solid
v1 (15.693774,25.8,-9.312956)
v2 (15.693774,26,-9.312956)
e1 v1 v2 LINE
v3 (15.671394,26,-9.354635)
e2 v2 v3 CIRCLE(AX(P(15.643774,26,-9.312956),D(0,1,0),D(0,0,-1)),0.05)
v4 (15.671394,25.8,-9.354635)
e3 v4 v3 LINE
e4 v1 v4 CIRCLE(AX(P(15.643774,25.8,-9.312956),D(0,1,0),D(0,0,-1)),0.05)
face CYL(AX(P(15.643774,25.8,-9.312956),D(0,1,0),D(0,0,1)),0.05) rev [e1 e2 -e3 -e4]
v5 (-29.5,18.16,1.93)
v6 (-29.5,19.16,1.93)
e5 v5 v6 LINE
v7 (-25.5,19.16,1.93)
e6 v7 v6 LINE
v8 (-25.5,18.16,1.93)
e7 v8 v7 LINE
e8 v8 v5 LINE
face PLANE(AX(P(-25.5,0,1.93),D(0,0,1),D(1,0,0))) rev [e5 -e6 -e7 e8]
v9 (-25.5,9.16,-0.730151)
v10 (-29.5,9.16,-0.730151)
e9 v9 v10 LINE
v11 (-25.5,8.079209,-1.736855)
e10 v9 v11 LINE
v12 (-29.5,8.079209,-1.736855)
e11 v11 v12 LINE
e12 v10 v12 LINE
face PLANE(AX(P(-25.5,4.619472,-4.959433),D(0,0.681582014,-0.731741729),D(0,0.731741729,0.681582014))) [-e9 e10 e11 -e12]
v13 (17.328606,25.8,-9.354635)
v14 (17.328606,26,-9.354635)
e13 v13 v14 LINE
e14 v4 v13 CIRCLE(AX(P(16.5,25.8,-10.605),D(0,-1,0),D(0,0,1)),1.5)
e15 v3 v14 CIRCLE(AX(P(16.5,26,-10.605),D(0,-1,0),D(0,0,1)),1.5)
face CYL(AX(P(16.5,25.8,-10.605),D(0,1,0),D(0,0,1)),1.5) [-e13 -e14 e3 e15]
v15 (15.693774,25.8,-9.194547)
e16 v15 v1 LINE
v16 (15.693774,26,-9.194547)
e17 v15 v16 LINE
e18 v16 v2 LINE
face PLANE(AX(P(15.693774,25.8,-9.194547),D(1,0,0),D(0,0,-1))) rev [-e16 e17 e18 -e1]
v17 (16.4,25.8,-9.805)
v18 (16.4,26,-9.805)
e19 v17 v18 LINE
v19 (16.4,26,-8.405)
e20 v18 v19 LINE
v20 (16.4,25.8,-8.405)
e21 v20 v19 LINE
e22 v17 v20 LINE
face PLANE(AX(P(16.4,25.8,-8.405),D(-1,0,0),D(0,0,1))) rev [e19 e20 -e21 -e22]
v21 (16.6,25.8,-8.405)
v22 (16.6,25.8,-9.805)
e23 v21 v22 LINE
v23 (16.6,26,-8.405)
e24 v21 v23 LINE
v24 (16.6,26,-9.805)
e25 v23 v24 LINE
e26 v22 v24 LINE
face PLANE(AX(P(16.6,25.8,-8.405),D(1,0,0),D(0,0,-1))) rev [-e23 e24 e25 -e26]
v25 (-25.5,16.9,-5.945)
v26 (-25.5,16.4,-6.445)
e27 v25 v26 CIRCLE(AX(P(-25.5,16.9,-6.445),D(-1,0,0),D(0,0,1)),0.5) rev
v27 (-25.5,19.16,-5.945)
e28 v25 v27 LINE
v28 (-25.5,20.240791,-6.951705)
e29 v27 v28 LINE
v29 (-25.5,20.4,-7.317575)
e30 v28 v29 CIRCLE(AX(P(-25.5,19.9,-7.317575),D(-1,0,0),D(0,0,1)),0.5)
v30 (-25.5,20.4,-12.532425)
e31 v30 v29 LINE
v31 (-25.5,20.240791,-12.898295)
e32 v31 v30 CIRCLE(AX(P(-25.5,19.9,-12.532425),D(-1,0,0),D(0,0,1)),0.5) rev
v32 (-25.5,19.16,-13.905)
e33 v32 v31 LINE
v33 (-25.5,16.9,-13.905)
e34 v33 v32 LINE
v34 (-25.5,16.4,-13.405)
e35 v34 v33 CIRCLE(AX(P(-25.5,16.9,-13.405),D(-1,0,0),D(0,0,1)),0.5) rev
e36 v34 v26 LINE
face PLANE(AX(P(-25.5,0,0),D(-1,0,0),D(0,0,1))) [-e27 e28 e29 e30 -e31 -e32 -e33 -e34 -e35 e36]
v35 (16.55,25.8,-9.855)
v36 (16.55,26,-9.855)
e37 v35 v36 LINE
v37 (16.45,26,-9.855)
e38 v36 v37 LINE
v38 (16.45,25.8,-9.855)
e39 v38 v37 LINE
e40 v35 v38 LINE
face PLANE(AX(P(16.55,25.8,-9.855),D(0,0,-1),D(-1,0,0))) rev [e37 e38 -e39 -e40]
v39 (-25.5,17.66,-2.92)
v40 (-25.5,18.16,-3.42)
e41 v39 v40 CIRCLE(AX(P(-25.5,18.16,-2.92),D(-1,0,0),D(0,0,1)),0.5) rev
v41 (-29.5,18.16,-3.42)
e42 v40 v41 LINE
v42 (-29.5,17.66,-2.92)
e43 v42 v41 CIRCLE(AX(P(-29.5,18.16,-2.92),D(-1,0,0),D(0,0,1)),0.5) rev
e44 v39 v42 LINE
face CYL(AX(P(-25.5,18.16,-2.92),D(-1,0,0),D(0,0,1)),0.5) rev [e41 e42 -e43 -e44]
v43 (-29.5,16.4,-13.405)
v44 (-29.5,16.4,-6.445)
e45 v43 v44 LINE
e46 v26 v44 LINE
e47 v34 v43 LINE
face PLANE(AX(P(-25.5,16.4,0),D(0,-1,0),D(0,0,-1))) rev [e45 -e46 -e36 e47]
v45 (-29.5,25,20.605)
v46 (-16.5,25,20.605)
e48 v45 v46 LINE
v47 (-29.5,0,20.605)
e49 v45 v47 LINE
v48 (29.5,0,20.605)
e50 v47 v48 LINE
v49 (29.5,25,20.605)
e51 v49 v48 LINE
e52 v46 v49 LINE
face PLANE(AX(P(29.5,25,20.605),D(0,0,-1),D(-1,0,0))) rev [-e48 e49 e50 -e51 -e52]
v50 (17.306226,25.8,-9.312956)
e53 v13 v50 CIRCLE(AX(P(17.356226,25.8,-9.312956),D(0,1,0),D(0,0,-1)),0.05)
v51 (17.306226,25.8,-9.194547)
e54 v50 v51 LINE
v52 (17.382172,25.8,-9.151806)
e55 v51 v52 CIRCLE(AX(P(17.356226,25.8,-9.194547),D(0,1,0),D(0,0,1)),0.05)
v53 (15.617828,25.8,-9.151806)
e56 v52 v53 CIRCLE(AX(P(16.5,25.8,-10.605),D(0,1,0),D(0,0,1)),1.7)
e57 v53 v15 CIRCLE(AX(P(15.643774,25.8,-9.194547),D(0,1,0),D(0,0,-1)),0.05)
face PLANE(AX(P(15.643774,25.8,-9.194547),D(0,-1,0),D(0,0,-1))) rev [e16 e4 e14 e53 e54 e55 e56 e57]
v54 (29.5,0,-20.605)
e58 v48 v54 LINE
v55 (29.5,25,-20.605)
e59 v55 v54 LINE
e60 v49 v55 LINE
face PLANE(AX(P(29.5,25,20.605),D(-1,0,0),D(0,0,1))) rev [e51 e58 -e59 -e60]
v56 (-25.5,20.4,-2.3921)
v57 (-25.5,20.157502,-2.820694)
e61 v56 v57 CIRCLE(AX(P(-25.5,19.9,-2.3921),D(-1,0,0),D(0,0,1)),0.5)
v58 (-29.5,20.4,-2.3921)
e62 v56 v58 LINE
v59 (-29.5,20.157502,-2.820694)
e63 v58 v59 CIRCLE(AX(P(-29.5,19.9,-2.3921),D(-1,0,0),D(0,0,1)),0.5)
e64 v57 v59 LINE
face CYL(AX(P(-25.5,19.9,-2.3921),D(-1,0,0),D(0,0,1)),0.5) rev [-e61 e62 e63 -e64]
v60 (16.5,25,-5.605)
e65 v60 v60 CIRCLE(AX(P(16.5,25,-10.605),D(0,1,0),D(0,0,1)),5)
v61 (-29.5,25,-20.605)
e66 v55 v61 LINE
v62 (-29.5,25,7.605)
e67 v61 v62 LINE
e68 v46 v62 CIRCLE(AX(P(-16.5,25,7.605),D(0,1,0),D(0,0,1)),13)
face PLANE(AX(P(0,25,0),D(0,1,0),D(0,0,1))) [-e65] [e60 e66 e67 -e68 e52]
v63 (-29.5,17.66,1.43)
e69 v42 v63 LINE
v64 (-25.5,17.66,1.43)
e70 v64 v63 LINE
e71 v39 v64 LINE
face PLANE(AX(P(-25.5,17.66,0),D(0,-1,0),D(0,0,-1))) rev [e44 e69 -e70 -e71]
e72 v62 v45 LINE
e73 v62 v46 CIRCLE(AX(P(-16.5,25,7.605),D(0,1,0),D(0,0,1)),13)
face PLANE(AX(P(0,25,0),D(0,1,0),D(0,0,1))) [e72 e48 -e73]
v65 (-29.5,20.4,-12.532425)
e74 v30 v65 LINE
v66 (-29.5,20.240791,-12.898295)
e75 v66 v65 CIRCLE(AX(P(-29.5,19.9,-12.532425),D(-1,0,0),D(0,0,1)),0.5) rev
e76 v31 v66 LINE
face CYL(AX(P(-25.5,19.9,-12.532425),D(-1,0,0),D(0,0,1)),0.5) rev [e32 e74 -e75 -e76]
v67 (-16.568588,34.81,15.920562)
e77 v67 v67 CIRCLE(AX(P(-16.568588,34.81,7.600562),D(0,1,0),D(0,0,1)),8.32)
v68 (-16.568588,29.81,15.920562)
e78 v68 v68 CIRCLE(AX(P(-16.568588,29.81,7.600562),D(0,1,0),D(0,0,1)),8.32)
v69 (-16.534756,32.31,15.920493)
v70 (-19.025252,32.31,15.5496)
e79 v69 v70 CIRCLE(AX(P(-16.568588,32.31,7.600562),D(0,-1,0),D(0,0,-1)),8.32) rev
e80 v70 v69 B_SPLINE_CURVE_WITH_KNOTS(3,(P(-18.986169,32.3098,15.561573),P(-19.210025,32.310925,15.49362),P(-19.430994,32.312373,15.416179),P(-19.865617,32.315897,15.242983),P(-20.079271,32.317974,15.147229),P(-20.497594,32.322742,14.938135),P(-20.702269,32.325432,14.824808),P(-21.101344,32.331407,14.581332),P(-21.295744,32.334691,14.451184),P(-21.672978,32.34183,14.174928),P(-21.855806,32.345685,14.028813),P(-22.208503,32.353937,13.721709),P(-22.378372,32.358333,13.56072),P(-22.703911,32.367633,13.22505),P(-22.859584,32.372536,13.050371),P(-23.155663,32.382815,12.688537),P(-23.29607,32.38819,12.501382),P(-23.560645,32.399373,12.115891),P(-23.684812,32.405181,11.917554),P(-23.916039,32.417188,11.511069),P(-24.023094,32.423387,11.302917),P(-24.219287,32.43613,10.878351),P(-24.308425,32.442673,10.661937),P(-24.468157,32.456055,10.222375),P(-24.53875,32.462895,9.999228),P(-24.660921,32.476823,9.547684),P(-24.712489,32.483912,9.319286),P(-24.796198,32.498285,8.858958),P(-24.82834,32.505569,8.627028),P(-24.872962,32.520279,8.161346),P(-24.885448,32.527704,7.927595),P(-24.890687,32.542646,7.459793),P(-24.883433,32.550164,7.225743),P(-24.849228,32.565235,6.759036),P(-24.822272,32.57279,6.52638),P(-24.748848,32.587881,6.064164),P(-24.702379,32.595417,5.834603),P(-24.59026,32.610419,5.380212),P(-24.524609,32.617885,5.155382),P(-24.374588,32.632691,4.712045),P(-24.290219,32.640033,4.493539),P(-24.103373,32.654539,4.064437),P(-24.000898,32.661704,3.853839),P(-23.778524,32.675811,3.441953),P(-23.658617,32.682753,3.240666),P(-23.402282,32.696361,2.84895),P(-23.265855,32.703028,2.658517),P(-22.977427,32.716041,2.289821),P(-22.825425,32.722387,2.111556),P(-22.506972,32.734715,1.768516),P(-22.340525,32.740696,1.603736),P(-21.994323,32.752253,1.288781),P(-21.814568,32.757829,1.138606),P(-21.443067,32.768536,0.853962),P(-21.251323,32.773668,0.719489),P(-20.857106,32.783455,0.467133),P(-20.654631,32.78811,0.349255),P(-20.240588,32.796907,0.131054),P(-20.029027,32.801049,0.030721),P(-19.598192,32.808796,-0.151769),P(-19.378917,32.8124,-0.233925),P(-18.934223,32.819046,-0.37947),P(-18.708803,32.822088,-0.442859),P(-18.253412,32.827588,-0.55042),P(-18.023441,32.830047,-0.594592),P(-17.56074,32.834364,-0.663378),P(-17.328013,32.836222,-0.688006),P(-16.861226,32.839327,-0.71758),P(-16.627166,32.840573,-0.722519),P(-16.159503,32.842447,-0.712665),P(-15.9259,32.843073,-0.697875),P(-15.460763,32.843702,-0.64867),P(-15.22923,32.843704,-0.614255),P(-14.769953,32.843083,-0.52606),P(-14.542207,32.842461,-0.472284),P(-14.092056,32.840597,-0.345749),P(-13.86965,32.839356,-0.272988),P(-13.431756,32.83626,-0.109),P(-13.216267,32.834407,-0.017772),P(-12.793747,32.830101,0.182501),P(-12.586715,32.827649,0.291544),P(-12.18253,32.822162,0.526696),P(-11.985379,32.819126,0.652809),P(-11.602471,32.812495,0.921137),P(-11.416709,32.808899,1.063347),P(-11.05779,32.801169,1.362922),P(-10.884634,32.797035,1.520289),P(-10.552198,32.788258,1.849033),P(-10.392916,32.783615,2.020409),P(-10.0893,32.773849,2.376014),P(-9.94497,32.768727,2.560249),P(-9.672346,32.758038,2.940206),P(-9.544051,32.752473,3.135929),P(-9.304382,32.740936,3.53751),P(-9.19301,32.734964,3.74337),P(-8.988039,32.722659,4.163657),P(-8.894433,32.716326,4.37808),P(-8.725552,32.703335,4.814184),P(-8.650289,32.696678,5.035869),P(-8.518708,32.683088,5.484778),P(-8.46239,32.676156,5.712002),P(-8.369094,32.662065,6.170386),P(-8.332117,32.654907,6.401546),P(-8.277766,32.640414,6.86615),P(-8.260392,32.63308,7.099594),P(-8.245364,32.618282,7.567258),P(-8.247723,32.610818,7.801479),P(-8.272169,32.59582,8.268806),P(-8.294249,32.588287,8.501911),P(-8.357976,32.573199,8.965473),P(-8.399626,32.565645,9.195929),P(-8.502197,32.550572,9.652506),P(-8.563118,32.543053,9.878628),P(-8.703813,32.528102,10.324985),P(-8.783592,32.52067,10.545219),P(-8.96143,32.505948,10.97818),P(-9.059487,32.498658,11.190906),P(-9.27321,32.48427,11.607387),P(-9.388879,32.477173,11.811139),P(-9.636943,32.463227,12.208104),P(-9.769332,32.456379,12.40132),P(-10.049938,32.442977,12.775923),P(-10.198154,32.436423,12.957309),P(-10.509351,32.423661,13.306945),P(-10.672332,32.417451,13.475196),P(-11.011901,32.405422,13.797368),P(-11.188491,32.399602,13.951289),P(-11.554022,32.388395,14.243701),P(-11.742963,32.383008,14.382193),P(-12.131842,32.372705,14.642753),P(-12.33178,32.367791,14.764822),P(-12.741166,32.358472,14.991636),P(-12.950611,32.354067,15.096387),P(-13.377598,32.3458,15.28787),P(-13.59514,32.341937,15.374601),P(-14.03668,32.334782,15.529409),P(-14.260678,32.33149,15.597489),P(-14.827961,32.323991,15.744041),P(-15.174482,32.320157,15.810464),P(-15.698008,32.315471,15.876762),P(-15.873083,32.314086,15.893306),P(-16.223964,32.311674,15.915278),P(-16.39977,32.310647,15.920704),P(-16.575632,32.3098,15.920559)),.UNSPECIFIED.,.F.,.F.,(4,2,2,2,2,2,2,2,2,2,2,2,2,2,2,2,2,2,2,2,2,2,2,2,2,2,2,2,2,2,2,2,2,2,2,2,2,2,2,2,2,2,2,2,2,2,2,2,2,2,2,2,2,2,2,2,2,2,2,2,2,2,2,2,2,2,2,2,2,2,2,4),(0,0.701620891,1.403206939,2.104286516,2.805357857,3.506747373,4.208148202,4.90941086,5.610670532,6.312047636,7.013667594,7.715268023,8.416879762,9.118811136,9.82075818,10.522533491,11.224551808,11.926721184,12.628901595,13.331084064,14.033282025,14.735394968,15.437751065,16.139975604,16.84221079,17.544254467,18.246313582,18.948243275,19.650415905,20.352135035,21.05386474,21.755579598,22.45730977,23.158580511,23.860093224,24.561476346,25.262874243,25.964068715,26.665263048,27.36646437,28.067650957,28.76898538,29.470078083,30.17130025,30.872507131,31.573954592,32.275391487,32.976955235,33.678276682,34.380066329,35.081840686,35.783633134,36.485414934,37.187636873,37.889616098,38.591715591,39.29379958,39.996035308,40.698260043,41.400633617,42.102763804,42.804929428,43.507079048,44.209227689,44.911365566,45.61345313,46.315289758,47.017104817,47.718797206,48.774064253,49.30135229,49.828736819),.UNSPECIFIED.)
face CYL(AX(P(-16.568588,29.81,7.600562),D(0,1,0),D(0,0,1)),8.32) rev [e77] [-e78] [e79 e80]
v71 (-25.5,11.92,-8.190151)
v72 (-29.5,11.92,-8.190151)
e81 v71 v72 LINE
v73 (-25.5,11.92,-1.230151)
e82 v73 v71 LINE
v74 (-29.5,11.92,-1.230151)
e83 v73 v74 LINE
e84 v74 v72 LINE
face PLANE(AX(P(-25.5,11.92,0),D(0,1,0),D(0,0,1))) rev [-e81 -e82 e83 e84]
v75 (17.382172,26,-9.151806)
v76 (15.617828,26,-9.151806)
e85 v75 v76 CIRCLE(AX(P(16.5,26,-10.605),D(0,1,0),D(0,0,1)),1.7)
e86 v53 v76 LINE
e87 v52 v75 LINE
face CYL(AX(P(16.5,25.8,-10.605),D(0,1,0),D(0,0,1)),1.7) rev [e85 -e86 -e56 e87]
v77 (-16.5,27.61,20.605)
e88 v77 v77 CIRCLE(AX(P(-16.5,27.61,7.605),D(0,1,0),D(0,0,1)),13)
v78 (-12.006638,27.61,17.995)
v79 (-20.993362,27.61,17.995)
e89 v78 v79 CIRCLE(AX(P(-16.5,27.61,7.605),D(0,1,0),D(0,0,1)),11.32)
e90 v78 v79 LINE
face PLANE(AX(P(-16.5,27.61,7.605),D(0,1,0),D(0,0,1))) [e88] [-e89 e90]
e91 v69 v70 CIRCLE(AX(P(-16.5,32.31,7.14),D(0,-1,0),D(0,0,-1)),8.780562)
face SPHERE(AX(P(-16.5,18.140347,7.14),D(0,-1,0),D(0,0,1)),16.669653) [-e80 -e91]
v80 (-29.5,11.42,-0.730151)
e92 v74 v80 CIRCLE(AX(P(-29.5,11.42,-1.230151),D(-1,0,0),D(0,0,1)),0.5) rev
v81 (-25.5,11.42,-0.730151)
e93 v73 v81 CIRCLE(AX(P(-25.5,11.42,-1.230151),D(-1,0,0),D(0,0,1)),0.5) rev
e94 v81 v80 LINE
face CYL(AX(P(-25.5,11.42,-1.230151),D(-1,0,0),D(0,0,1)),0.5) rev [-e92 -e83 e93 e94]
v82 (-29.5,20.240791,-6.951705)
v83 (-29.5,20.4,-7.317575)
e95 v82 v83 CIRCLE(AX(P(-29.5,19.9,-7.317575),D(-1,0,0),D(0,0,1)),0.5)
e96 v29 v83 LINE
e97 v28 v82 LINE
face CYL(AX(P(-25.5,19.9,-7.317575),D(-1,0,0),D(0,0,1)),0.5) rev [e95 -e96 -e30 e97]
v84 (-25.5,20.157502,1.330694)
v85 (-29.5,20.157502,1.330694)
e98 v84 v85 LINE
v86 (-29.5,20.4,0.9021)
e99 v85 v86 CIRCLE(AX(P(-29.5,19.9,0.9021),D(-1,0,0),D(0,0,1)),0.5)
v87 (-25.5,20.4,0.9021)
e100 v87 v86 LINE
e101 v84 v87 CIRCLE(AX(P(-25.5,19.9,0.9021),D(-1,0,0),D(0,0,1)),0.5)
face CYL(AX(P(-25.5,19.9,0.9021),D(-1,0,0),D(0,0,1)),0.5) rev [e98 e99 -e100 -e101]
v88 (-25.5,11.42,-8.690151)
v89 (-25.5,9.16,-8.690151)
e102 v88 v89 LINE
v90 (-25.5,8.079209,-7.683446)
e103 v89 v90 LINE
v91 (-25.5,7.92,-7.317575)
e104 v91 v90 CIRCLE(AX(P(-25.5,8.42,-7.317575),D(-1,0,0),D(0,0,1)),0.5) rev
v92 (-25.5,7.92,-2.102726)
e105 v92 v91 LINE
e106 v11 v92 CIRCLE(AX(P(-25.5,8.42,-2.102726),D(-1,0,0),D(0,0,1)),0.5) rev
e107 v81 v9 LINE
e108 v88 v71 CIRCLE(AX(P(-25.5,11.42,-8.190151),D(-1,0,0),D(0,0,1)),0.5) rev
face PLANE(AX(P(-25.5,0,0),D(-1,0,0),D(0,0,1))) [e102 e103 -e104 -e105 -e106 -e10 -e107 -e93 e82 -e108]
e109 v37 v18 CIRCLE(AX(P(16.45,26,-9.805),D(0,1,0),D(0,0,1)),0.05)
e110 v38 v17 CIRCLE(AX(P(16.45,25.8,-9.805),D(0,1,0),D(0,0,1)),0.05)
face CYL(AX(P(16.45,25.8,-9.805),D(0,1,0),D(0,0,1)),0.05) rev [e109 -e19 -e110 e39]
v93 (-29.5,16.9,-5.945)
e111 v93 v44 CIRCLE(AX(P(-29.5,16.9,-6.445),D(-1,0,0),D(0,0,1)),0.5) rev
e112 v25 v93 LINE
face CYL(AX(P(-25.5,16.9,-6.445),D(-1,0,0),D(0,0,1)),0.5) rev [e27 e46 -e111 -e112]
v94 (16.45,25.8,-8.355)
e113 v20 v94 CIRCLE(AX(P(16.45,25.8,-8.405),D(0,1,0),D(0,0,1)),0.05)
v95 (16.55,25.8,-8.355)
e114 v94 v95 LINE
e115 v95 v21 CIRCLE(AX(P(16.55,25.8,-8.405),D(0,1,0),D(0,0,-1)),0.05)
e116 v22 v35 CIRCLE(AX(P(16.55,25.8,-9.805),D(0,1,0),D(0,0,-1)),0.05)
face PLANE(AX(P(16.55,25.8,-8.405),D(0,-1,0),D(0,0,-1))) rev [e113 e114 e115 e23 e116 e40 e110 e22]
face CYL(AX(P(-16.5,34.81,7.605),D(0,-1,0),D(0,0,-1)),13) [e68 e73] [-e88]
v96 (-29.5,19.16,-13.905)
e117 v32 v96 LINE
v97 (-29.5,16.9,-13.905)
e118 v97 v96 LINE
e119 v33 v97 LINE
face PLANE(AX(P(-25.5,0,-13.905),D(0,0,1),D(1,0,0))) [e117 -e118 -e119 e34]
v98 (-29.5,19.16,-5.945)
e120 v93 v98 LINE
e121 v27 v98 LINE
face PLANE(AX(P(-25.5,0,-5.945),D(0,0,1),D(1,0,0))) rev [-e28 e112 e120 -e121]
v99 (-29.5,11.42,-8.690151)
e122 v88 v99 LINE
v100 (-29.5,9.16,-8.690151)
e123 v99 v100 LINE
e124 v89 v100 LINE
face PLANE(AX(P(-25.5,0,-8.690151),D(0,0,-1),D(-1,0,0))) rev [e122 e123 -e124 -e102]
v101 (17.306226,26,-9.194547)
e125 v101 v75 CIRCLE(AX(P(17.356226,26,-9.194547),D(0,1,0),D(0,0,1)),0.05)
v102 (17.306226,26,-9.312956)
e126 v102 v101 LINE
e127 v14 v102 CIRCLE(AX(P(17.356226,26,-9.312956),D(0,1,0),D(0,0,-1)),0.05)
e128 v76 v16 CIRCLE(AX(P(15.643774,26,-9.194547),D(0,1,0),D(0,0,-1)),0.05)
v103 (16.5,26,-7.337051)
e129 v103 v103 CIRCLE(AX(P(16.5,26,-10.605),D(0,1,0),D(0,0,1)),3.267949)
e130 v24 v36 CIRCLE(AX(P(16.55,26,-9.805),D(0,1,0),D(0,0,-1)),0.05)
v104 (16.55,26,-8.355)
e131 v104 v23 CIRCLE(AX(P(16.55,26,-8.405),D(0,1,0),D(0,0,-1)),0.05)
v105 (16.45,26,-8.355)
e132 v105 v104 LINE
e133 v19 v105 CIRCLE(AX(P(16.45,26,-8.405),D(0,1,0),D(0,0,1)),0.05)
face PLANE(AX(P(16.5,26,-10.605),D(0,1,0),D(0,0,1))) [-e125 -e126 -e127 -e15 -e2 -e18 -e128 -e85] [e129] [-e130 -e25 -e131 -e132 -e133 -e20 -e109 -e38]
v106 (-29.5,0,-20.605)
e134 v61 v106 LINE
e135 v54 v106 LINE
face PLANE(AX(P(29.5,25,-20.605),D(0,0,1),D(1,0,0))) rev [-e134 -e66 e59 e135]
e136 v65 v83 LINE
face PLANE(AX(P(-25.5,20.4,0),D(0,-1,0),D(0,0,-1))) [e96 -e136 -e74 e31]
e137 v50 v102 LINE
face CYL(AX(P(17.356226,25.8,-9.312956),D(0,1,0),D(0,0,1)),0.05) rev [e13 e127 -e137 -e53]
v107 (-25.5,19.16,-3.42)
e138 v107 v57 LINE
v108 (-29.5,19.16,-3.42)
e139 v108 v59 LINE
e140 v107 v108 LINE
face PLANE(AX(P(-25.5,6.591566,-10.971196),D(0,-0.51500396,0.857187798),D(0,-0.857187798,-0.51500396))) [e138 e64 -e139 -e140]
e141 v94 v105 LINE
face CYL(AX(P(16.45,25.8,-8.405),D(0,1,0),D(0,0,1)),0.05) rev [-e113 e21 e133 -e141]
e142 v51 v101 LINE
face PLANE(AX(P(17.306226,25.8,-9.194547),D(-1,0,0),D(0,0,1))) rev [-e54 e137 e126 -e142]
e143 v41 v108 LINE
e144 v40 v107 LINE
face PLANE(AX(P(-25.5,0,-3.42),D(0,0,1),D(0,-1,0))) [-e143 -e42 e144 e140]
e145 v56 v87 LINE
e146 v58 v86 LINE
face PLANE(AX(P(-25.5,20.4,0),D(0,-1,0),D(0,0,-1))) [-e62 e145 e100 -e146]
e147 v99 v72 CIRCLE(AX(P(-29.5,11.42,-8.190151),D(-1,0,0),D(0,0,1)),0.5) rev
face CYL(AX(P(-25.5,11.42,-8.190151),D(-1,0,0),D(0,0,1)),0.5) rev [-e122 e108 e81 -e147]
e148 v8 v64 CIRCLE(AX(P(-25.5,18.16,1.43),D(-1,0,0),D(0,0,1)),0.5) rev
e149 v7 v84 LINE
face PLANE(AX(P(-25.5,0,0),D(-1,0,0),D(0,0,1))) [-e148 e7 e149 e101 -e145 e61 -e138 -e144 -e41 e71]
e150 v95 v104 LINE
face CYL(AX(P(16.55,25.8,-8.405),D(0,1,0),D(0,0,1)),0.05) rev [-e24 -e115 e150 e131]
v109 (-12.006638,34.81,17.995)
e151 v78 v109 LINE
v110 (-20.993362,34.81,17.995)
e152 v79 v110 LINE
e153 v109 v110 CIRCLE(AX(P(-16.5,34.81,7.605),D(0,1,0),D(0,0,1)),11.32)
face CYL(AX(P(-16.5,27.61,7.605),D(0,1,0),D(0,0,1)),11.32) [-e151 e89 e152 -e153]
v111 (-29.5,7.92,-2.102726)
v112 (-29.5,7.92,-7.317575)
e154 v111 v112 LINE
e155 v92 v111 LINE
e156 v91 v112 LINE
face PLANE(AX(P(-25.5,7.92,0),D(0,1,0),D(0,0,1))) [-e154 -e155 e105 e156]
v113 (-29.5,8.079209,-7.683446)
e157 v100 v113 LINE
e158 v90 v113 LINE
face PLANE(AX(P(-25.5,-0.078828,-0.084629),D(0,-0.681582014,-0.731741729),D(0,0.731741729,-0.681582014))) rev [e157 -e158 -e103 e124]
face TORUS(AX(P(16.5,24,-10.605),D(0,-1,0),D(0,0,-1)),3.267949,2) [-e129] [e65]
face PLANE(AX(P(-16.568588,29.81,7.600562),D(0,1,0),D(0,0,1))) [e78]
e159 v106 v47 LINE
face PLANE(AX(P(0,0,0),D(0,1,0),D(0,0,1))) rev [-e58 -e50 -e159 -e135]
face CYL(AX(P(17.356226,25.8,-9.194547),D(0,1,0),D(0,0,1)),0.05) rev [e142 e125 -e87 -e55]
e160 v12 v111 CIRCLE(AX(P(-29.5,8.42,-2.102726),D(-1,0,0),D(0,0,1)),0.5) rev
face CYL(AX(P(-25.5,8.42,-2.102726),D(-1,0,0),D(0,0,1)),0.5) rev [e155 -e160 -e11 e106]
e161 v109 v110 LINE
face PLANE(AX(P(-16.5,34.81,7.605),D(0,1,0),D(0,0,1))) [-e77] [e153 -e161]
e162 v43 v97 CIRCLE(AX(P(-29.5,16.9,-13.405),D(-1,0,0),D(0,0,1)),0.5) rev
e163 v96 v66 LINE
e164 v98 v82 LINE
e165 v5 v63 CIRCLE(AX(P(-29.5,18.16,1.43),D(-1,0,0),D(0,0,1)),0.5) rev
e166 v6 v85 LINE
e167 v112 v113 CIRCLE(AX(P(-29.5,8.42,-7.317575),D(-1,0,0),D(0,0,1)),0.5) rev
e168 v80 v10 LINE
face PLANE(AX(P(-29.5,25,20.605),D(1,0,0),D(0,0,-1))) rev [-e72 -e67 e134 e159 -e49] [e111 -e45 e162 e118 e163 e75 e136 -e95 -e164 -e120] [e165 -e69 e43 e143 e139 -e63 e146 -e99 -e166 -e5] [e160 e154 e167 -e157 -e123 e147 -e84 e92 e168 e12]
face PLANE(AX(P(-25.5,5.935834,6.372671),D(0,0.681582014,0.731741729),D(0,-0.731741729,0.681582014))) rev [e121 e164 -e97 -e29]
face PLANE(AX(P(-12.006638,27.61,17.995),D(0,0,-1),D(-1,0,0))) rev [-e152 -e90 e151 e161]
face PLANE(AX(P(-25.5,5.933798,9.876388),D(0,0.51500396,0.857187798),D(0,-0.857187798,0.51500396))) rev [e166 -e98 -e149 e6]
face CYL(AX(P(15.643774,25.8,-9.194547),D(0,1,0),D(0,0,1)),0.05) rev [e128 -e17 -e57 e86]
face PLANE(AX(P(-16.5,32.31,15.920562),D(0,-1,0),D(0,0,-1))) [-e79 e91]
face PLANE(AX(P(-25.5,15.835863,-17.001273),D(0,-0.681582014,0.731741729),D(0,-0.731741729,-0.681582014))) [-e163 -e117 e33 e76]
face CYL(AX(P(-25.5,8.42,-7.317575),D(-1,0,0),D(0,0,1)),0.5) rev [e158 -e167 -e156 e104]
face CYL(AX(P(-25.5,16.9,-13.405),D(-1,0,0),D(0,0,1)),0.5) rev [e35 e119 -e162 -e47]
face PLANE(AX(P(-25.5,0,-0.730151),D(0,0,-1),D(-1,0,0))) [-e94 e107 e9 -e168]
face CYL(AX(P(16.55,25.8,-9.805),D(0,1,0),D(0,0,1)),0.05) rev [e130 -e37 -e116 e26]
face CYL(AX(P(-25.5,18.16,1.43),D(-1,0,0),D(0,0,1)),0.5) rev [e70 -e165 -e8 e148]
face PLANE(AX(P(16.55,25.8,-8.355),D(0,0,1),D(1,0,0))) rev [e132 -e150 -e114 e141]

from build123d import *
from build123d.topology import SkipClean

# Parameters (mm, degrees)
CROQUIS1_W              = 59
CROQUIS1_H              = 41.21
SALIENTE_EXTRUIR1_DEPTH = 25
CROQUIS2_R              = 13
SALIENTE_EXTRUIR2_DEPTH = 9.81
CORTAR_EXTRUIR1_START   = -7.2
CROQUIS4_R              = 13
CROQUIS4_R_2            = 11.32
CORTAR_EXTRUIR1_DEPTH   = 7.2
CORTAR_EXTRUIR2_START   = -7.2
CORTAR_EXTRUIR2_DEPTH   = 7.2
CROQUIS7_R              = 8.32
CORTAR_EXTRUIR3_DEPTH   = 5
CROQUIS10_R             = 5
SALIENTE_EXTRUIR3_DEPTH = 1
REDONDEO1_R             = 2
CORTAR_EXTRUIR5_DEPTH   = 0.2
CROQUIS13_R             = 2.5
CORTAR_EXTRUIR6_DEPTH   = 5.2
ROSCA1_PITCH            = 0.8
CORTAR_EXTRUIR8_DEPTH   = 4
CROQUIS17_W             = 9.488888662
CROQUIS17_H             = 7.855040283
SALIENTE_EXTRUIR4_DEPTH = 10


with BuildPart() as part:
    # Croquis1 → Saliente-Extruir1 (new body)
    with BuildSketch(Plane(origin=(0, 0, 0), x_dir=(1, 0, 0), z_dir=(0, 1, 0))):
        Rectangle(CROQUIS1_W, CROQUIS1_H)
    extrude(amount=SALIENTE_EXTRUIR1_DEPTH)

    # Croquis2 → Saliente-Extruir2 (add)
    with BuildSketch(Plane(origin=(0, 25, 0), x_dir=(1, 0, 0), z_dir=(0, 1, 0))):
        with Locations(Location((-16.5, -7.605, 0), (0, 0, 270))):
            Circle(CROQUIS2_R)
    extrude(amount=SALIENTE_EXTRUIR2_DEPTH)

    # Croquis4 → Cortar-Extruir1 (cut)
    with BuildSketch(Plane(origin=(0, 34.81, 0), x_dir=(1, 0, 0), z_dir=(0, 1, 0)).offset(CORTAR_EXTRUIR1_START)):
        with Locations(Location((-16.5, -7.605, 0), (0, 0, 270))):
            Circle(CROQUIS4_R)
        with Locations(Location((-16.5, -7.605, 0), (0, 0, 270))):
            Circle(CROQUIS4_R_2, mode=Mode.SUBTRACT)
    extrude(amount=CORTAR_EXTRUIR1_DEPTH, mode=Mode.SUBTRACT)

    # Croquis6 → Cortar-Extruir2 (cut)
    with BuildSketch(Plane(origin=(0, 34.81, 0), x_dir=(1, 0, 0), z_dir=(0, 1, 0)).offset(CORTAR_EXTRUIR2_START)):
        with BuildLine():
            Line((-12.00663823, -17.995), (-20.99336177, -17.995))
            ThreePointArc((-20.99336177, -17.995), (-16.5, -18.925), (-12.00663823, -17.995))
        make_face()
    extrude(amount=CORTAR_EXTRUIR2_DEPTH, mode=Mode.SUBTRACT)

    # Croquis7 → Cortar-Extruir3 (cut)
    with BuildSketch(Plane(origin=(0, 34.81, 0), x_dir=(1, 0, 0), z_dir=(0, 1, 0))):
        with Locations(Location((-16.568588437, -7.600561682, 0), (0, 0, 270))):
            Circle(CROQUIS7_R)
    extrude(amount=-CORTAR_EXTRUIR3_DEPTH, mode=Mode.SUBTRACT)

    # Croquis9 → Revolución2 (revolve)
    with BuildSketch(Plane.ZY.offset(16.5)):
        with BuildLine():
            Line((15.920561682, 32.31), (7.14, 32.31))
            Line((7.14, 32.31), (7.14, 34.81))
            ThreePointArc((7.14, 34.81), (11.704763506, 34.17282232), (15.920561682, 32.31))
        make_face()
    revolve(axis=Axis((-16.5, 32.31, 7.14), (0, 1, 0)))

    # Croquis10 → Saliente-Extruir3 (add)
    with BuildSketch(Plane(origin=(0, 25, 0), x_dir=(1, 0, 0), z_dir=(0, 1, 0))):
        with Locations(Location((16.5, 10.605, 0), (0, 0, 270))):
            Circle(CROQUIS10_R)
    extrude(amount=SALIENTE_EXTRUIR3_DEPTH)

    # Redondeo1
    # the kernel refuses this fillet: 2 mm, written as the material it takes off along each edge
    with BuildSketch(Plane(origin=(16.5, 26, -10.605), x_dir=(0, 0, 1), z_dir=(-1, 0, 0))) as redondeo1_piece_1:
        with BuildLine():
            CenterArc((3.267949192, -2), REDONDEO1_R, 30, 60)
            Line((3.267949192, 0), (3.267949192, 0.04))
            Line((3.267949192, 0.04), (5, 0.04))
            Line((5, 0.04), (5.04, 0))
            ThreePointArc((5.04, 0), (5.04, -0.5), (5.034641016, -0.98))
            Line((5.034641016, -0.98), (5, -1))
        make_face()
    revolve(axis=Axis((16.5, 26, -10.605), (0, 1, 0)), mode=Mode.SUBTRACT)

    # Croquis12 → Cortar-Extruir5 (cut)
    with BuildSketch(Plane(origin=(0, 26, 0), x_dir=(1, 0, 0), z_dir=(0, 1, 0))):
        with BuildLine():
            Line((15.693774225, 9.194547086), (15.693774225, 9.312956107))
            ThreePointArc((15.693774225, 9.312956107), (15.687825385, 9.33660976), (15.671394411, 9.354634942))
            ThreePointArc((15.671394411, 9.354634942), (16.5, 12.105), (17.328605589, 9.354634942))
            ThreePointArc((17.328605589, 9.354634942), (17.312174615, 9.33660976), (17.306225775, 9.312956107))
            Line((17.306225775, 9.312956107), (17.306225775, 9.194547086))
            ThreePointArc((17.306225775, 9.194547086), (17.331703456, 9.150973517), (17.38217201, 9.151806089))
            ThreePointArc((17.38217201, 9.151806089), (16.5, 12.305), (15.61782799, 9.151806089))
            ThreePointArc((15.61782799, 9.151806089), (15.668296544, 9.150973517), (15.693774225, 9.194547086))
        make_face()
        with BuildLine():
            Line((16.55, 8.355), (16.45, 8.355))
            ThreePointArc((16.45, 8.355), (16.414644661, 8.369644661), (16.4, 8.405))
            Line((16.4, 8.405), (16.4, 9.805))
            ThreePointArc((16.4, 9.805), (16.414644661, 9.840355339), (16.45, 9.855))
            Line((16.45, 9.855), (16.55, 9.855))
            ThreePointArc((16.55, 9.855), (16.585355339, 9.840355339), (16.6, 9.805))
            Line((16.6, 9.805), (16.6, 8.405))
            ThreePointArc((16.6, 8.405), (16.585355339, 8.369644661), (16.55, 8.355))
        make_face()
    extrude(amount=-CORTAR_EXTRUIR5_DEPTH, mode=Mode.SUBTRACT)

    # Croquis13 → Cortar-Extruir6 (cut)
    with BuildSketch(Plane(origin=(0, 0, -20.605), x_dir=(-1, 0, 0), z_dir=(0, 0, -1))):
        with Locations((19, 13.3)):
            Circle(CROQUIS13_R)
    extrude(amount=-CORTAR_EXTRUIR6_DEPTH, mode=Mode.SUBTRACT)

    # Rosca1: the profile of Perfil de rosca1 profile screwed along a right-hand helix of 6.5 turns, 8 arcs to a turn; built about Z, then put on its axis
    with SkipClean():  # the faces are left unmerged after this step: merging them gives an invalid solid
        rosca1_z = Axis((0, 0, 0), (0, 0, 1))
        rosca1_corners = [(2.5003, 0, -0.000173205), (2.5003, 0, 0.700173203), (2.0669873, 0, 0.449999999), (2.0669873, 0, 0.249999999)]
        with BuildLine(mode=Mode.PRIVATE) as rosca1_profile:
            Line(rosca1_corners[0], rosca1_corners[1])
            Line(rosca1_corners[1], rosca1_corners[2])
            Line(rosca1_corners[2], rosca1_corners[3])
            Line(rosca1_corners[3], rosca1_corners[0])
        rosca1_cap = Face(rosca1_profile.wire())
        rosca1_turn_angles = [0, 22.5, 45, 67.5, 90, 112.5, 135, 157.5, 180, 202.5, 225, 247.5, 270, 292.5, 315, 337.5, 360]
        rosca1_turn_weights = [1, 0.9238795325112867, 1, 0.9238795325112867, 1, 0.9238795325112867, 1, 0.9238795325112867, 1, 0.9238795325112867, 1, 0.9238795325112867, 1, 0.9238795325112867, 1, 0.9238795325112867, 1]
        rosca1_turn_rails = [Edge.make_bspline([Vector(p[0], p[1], 0).rotate(rosca1_z, rosca1_turn_angles[k]) / rosca1_turn_weights[k] + Vector(0, 0, p[2] + ROSCA1_PITCH * rosca1_turn_angles[k] / 360) for k in range(17)], [0, 0, 0, 1, 1, 2, 2, 3, 3, 4, 4, 5, 5, 6, 6, 7, 7, 8, 8, 8], 2, rosca1_turn_weights) for p in rosca1_corners]
        rosca1_turn_sides = [Face.make_surface_from_curves(rosca1_turn_rails[p[0]], rosca1_turn_rails[p[1]]) for p in [(0, 1), (1, 2), (2, 3), (3, 0)]]
        rosca1_last_angles = [2160, 2182.5, 2205, 2227.5, 2250, 2272.5, 2295, 2317.5, 2340]
        rosca1_last_weights = [1, 0.9238795325112867, 1, 0.9238795325112867, 1, 0.9238795325112867, 1, 0.9238795325112867, 1]
        rosca1_last_rails = [Edge.make_bspline([Vector(p[0], p[1], 0).rotate(rosca1_z, rosca1_last_angles[k]) / rosca1_last_weights[k] + Vector(0, 0, p[2] + ROSCA1_PITCH * rosca1_last_angles[k] / 360) for k in range(9)], [0, 0, 0, 1, 1, 2, 2, 3, 3, 4, 4, 4], 2, rosca1_last_weights) for p in rosca1_corners]
        rosca1_last_sides = [Face.make_surface_from_curves(rosca1_last_rails[p[0]], rosca1_last_rails[p[1]]) for p in [(0, 1), (1, 2), (2, 3), (3, 0)]]
        rosca1 = Plane(origin=(-19, 13.3, -20.605), x_dir=(1, 0, 0), z_dir=(0, 0, 1)) * Solid(Shell([*[p.moved(Location((0, 0, ROSCA1_PITCH * i))) for i in range(6) for p in rosca1_turn_sides], *rosca1_last_sides, rosca1_cap, rosca1_cap.rotate(rosca1_z, 2340).moved(Location((0, 0, ROSCA1_PITCH * 2340 / 360)))]))
        add(rosca1)

    # Croquis16 → Cortar-Extruir8 (cut)
    with SkipClean():  # the faces are left unmerged after this step: merging them gives an invalid solid
        with BuildSketch(Plane.ZY.offset(29.5)):
            with BuildLine():
                Line((-5.945, 19.16), (-6.951704527, 20.240791007))
                ThreePointArc((-6.951704527, 20.240791007), (-7.118070383, 20.358473284), (-7.317575391, 20.4))
                Line((-7.317575391, 20.4), (-12.532424609, 20.4))
                ThreePointArc((-12.532424609, 20.4), (-12.731929617, 20.358473284), (-12.898295473, 20.240791007))
                Line((-12.898295473, 20.240791007), (-13.905, 19.16))
                Line((-13.905, 19.16), (-13.905, 16.9))
                ThreePointArc((-13.905, 16.9), (-13.758553391, 16.546446609), (-13.405, 16.4))
                Line((-13.405, 16.4), (-6.445, 16.4))
                ThreePointArc((-6.445, 16.4), (-6.091446609, 16.546446609), (-5.945, 16.9))
                Line((-5.945, 16.9), (-5.945, 19.16))
            make_face()
            with BuildLine():
                Line((1.93, 19.16), (1.330694375, 20.15750198))
                ThreePointArc((1.330694375, 20.15750198), (1.148320916, 20.335172948), (0.902100476, 20.4))
                Line((0.902100476, 20.4), (-2.392100476, 20.4))
                ThreePointArc((-2.392100476, 20.4), (-2.638320916, 20.335172948), (-2.820694375, 20.15750198))
                Line((-2.820694375, 20.15750198), (-3.42, 19.16))
                Line((-3.42, 19.16), (-3.42, 18.16))
                ThreePointArc((-3.42, 18.16), (-3.273553391, 17.806446609), (-2.92, 17.66))
                Line((-2.92, 17.66), (1.43, 17.66))
                ThreePointArc((1.43, 17.66), (1.783553391, 17.806446609), (1.93, 18.16))
                Line((1.93, 18.16), (1.93, 19.16))
            make_face()
            with BuildLine():
                ThreePointArc((-1.736855309, 8.079208993), (-1.903221166, 7.961526716), (-2.102726174, 7.92))
                Line((-2.102726174, 7.92), (-7.317575391, 7.92))
                ThreePointArc((-7.317575391, 7.92), (-7.517080399, 7.961526716), (-7.683446256, 8.079208993))
                Line((-7.683446256, 8.079208993), (-8.690150783, 9.16))
                Line((-8.690150783, 9.16), (-8.690150783, 11.42))
                ThreePointArc((-8.690150783, 11.42), (-8.543704173, 11.773553391), (-8.190150783, 11.92))
                Line((-8.190150783, 11.92), (-1.230150783, 11.92))
                ThreePointArc((-1.230150783, 11.92), (-0.876597392, 11.773553391), (-0.730150783, 11.42))
                Line((-0.730150783, 11.42), (-0.730150783, 9.16))
                Line((-0.730150783, 9.16), (-1.736855309, 8.079208993))
            make_face()
        extrude(amount=-CORTAR_EXTRUIR8_DEPTH, mode=Mode.SUBTRACT)

    # Croquis17 → Saliente-Extruir4 (add)
    with BuildSketch(Plane(origin=(0, 0, -20.605), x_dir=(-1, 0, 0), z_dir=(0, 0, -1))):
        with Locations((19.260558774, 13.137356389)):
            Rectangle(CROQUIS17_W, CROQUIS17_H)
    extrude(amount=-SALIENTE_EXTRUIR4_DEPTH)


solid = part.part
